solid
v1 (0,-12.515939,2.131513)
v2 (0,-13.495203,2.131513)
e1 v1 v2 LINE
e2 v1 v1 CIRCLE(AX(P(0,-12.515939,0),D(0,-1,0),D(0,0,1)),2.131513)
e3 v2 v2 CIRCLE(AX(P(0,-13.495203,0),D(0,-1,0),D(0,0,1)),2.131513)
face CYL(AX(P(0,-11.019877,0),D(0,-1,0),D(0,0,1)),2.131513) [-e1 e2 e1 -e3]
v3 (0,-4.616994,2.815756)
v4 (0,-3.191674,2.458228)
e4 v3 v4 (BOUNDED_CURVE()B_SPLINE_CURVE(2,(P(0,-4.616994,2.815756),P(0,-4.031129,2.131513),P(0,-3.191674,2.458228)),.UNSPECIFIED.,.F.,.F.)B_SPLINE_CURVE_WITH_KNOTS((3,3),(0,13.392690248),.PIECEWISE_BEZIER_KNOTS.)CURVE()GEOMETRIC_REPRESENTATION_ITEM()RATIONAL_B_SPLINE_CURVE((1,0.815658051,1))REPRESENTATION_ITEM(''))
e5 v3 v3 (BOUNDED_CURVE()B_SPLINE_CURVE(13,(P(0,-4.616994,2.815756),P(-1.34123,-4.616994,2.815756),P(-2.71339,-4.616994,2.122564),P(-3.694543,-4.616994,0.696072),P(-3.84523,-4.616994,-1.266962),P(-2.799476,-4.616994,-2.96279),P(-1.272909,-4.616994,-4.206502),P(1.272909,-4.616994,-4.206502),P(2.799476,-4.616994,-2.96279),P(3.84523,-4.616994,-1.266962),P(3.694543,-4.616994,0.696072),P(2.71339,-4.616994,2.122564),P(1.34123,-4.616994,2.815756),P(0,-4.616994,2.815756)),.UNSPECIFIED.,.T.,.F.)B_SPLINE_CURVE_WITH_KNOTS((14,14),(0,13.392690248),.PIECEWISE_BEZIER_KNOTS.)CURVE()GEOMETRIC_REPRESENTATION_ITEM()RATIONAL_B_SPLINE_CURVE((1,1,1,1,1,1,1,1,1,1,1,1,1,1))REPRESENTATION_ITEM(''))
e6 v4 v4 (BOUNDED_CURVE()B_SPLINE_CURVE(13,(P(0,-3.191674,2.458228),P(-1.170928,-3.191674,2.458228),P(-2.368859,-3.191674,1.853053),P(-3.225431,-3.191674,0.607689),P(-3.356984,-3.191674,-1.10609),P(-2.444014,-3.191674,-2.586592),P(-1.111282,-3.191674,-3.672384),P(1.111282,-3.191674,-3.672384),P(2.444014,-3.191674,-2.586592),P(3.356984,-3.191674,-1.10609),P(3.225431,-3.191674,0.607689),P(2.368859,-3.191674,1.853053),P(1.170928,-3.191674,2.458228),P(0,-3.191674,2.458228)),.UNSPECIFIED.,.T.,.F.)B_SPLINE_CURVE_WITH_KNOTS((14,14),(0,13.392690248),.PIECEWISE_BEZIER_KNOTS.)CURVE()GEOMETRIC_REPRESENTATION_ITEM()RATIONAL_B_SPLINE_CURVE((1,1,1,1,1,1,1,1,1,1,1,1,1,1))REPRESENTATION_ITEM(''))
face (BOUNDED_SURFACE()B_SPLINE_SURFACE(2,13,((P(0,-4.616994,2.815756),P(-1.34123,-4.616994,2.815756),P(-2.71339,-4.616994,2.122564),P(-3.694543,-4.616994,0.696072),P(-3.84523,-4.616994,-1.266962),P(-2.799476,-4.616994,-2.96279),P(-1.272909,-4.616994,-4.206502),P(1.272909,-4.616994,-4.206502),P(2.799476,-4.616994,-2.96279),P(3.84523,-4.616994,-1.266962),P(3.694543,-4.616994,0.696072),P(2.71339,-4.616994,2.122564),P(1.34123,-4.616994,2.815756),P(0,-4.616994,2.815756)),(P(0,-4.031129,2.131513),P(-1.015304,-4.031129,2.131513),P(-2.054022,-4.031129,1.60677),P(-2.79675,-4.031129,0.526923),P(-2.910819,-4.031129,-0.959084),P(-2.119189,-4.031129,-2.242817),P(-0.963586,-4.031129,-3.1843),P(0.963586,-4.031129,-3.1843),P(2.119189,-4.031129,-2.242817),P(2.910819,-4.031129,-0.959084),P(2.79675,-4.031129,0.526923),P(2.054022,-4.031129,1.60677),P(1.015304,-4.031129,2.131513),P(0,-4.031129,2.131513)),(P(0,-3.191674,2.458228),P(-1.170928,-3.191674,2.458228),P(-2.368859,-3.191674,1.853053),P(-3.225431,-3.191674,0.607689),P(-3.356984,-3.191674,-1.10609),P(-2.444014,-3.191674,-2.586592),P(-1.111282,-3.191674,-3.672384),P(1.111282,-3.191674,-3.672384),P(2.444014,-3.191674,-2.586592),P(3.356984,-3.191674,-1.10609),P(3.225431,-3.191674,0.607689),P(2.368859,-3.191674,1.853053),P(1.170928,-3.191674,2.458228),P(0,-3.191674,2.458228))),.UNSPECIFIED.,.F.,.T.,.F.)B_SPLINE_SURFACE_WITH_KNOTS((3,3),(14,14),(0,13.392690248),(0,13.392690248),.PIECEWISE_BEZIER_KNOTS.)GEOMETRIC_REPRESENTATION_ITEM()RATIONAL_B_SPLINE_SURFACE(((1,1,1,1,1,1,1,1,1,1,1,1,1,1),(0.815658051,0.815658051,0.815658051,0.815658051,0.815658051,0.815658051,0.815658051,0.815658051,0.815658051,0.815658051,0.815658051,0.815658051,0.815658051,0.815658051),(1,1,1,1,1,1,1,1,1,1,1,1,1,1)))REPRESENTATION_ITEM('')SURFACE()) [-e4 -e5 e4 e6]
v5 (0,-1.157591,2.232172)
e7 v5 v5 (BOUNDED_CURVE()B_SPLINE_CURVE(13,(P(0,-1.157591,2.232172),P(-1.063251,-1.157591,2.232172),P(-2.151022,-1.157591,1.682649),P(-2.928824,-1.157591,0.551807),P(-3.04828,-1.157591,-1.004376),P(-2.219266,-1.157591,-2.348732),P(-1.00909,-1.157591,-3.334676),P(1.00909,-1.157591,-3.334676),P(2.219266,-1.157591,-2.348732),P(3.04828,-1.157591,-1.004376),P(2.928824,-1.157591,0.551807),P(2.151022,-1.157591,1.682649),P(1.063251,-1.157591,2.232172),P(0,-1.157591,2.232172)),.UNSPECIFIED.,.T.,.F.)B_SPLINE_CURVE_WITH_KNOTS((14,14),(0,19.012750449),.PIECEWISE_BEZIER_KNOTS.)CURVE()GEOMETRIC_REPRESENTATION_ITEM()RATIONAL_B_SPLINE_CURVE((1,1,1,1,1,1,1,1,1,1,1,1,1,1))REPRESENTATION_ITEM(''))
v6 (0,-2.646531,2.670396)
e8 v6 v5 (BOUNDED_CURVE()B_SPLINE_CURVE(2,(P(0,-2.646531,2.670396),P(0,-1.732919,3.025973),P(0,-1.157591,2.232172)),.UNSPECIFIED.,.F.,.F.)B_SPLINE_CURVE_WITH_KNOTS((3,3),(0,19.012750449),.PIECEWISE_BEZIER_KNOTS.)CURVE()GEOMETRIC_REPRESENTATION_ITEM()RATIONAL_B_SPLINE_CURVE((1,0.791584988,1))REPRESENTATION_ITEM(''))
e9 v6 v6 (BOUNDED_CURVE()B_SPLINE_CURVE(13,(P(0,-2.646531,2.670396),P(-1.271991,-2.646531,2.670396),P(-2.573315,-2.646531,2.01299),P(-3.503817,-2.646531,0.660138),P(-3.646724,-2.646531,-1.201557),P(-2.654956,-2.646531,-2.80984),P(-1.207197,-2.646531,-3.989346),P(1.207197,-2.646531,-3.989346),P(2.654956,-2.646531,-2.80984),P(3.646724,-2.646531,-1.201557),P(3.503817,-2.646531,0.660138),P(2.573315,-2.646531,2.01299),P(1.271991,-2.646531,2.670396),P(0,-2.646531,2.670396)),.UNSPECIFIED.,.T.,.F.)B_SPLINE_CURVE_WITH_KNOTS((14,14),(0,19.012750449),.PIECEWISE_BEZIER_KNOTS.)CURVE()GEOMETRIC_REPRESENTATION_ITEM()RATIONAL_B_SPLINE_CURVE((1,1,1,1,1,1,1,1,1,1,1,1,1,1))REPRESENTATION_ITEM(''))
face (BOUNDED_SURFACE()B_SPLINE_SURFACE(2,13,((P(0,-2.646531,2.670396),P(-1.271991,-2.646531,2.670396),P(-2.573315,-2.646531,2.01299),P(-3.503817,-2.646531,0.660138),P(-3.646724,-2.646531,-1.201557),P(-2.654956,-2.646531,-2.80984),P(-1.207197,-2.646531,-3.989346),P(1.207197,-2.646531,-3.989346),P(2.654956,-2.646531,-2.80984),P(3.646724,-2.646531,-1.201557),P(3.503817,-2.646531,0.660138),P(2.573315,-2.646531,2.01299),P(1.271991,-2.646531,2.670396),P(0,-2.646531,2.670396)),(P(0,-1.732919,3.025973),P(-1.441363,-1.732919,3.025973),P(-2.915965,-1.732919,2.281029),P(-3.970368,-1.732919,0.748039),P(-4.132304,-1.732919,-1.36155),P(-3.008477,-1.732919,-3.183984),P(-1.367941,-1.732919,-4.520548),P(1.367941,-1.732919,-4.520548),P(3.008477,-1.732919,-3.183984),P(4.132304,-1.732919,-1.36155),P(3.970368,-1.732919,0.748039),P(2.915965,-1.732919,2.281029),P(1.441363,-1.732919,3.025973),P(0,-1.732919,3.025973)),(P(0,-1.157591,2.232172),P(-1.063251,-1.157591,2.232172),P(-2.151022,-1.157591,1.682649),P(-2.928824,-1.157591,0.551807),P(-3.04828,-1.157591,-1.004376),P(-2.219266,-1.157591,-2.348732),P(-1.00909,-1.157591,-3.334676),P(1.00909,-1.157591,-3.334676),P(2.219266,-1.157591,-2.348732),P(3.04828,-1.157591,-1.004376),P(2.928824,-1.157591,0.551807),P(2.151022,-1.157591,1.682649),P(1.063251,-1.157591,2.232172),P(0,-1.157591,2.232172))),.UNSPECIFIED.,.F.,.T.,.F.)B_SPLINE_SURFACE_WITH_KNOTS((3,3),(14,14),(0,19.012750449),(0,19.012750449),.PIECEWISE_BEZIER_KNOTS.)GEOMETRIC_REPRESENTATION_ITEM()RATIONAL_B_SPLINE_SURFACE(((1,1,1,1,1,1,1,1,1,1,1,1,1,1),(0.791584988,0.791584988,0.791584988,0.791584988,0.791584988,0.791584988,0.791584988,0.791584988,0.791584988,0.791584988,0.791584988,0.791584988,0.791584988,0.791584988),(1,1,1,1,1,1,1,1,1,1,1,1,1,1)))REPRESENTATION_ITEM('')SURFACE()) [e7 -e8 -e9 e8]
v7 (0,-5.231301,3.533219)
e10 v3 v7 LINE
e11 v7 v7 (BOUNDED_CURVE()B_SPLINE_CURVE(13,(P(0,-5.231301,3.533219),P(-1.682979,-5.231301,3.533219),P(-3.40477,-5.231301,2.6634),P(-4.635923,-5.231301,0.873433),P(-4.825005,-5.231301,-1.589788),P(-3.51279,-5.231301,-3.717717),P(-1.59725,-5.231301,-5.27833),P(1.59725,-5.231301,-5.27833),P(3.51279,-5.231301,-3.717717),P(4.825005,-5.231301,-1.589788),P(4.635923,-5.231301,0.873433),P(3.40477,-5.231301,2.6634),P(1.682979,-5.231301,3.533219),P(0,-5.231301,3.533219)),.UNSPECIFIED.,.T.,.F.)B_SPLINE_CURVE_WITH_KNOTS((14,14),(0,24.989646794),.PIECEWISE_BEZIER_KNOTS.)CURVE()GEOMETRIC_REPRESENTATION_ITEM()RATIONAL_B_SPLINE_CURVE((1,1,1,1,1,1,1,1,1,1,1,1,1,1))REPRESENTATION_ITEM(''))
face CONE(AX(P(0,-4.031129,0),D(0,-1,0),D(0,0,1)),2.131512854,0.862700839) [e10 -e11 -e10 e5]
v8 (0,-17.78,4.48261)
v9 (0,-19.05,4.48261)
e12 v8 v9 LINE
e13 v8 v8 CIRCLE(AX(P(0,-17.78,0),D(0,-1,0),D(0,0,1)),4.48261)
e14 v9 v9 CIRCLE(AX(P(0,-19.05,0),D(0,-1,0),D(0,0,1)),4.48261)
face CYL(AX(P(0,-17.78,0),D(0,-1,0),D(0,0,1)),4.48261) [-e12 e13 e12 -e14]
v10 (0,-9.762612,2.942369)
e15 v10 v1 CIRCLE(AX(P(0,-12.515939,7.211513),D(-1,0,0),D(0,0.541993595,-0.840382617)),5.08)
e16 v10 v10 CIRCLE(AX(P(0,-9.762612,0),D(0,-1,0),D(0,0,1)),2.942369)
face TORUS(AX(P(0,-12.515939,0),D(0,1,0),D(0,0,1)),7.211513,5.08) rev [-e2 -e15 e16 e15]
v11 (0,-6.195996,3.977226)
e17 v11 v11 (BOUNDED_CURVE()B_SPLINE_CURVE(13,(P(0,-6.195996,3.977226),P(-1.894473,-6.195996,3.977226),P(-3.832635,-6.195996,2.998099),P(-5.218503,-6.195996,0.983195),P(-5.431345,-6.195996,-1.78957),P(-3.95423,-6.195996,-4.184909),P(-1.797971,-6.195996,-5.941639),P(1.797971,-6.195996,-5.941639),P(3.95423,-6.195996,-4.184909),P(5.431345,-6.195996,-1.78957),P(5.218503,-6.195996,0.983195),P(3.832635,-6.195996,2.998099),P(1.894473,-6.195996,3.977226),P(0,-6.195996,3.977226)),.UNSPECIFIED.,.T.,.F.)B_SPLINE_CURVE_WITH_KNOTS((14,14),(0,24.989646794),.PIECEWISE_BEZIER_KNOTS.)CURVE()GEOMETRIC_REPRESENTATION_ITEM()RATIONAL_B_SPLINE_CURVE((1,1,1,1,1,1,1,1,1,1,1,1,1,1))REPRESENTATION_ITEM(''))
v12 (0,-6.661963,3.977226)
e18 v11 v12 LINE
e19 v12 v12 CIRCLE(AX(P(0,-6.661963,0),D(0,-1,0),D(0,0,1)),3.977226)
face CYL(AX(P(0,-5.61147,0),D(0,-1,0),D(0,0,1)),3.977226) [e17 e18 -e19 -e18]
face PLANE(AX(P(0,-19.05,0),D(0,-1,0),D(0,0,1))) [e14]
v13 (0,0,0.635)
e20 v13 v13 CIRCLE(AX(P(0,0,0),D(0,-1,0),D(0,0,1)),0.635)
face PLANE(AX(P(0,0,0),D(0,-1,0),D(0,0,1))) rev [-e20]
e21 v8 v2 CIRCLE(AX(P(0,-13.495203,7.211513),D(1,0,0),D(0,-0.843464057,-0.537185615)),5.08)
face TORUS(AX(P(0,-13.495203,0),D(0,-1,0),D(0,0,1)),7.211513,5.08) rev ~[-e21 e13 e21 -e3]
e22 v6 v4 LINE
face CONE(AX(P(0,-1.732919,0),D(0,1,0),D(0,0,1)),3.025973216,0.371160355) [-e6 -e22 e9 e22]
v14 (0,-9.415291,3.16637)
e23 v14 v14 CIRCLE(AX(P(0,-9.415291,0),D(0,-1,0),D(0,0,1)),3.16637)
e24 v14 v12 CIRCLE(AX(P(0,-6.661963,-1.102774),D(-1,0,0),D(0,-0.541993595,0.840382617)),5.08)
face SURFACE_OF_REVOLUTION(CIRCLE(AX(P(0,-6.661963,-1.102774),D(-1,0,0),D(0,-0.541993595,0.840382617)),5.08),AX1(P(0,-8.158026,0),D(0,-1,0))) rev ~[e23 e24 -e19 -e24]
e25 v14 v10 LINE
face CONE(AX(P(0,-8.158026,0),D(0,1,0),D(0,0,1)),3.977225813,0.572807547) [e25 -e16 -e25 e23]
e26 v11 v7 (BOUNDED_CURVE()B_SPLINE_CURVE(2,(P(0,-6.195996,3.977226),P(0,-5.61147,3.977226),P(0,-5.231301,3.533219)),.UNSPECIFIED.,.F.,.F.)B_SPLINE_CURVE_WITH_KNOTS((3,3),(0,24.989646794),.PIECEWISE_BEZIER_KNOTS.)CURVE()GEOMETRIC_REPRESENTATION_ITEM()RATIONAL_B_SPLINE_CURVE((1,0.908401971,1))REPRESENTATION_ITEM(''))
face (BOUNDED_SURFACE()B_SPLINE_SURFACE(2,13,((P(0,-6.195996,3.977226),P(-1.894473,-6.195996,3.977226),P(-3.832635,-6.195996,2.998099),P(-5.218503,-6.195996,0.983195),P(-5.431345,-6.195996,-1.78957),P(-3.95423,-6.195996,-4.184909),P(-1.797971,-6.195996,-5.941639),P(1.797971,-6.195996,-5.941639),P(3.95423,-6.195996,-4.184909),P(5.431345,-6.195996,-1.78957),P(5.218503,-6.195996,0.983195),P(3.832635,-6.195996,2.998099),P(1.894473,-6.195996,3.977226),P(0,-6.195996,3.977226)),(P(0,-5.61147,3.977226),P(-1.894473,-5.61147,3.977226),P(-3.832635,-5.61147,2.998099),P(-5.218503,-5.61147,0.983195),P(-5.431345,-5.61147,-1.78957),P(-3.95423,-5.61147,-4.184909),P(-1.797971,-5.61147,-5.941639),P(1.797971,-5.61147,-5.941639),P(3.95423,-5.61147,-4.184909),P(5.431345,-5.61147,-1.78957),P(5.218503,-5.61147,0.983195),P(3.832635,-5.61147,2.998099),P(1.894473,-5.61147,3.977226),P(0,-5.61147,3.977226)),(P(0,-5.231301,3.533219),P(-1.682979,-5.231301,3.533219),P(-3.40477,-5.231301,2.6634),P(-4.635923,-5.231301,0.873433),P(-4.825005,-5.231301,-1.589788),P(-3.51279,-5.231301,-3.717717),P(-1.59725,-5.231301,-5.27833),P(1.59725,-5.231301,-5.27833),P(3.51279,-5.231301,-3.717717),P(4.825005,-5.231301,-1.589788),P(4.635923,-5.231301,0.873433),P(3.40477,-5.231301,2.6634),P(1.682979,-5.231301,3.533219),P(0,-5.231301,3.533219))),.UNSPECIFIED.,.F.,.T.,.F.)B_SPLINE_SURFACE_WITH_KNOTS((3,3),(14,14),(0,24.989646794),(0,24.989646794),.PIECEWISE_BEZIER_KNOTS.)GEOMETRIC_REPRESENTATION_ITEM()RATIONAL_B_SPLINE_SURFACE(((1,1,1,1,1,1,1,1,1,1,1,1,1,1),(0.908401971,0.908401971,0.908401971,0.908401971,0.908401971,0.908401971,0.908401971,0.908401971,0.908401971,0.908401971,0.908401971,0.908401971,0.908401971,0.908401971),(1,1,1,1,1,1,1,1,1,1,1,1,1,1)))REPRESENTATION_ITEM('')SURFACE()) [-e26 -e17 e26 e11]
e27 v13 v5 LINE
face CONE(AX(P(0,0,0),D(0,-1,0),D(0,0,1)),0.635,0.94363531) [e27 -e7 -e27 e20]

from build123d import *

# Parameters (mm, degrees)
F3_R = 1.27


# Not quite as in the source:
# - a fillet or chamfer that OpenCascade refuses, or shapes differently, is made with other operations: its cross-section is extruded or revolved along the edge and cut away or added


with BuildPart() as f1:
    # F0 (on Right) → F1 (revolve)
    with BuildSketch(Plane.YZ):
        Polygon((-19.05, 0), (0, 0), (0, 0.635), (-1.7329187831, 3.0259732157), (-4.0311289486, 2.1315128542), (-5.611469965, 3.9772258134), (-8.1580255717, 3.9772258134), (-11.0198768943, 2.1315128542), (-17.4555711955, 2.1315128542), (-17.78, 4.4826099296), (-19.05, 4.4826099296), align=None)
    revolve(axis=Axis((0, -9.525, 0), (0, -1, 0)))

    # F2: fillet of radius 5.08 on 3 edges, made by hand

    # F2_s1 → F2_t2 (revolve)
    with BuildSketch(Plane.YZ):
        with BuildLine():
            ThreePointArc((-9.7626119553, 2.94236916), (-11.0808174663, 2.3384414426), (-12.5159394181, 2.1315128542))
            Line((-12.5159394181, 2.1315128542), (-11.0198768943, 2.1315128542))
            Line((-11.0198768943, 2.1315128542), (-9.7626119553, 2.94236916))
        make_face()
    revolve(axis=Axis((0, -11.0198768943, 0), (0, -1, 0)))

    # F2_s3 → F2_t4 (revolve, cut)
    with BuildSketch(Plane.YZ):
        with BuildLine():
            ThreePointArc((-9.4152905107, 3.1663695077), (-8.0970849997, 3.7702972251), (-6.6619630479, 3.9772258134))
            Line((-6.6619630479, 3.9772258134), (-8.1580255717, 3.9772258134))
            Line((-8.1580255717, 3.9772258134), (-9.4152905107, 3.1663695077))
        make_face()
    revolve(axis=Axis((0, -8.1580255717, 0), (0, -1, 0)), mode=Mode.SUBTRACT)

    # F2_s5 → F2_t6 (revolve)
    with BuildSketch(Plane.YZ):
        with BuildLine():
            ThreePointArc((-17.78, 4.4826099296), (-15.9389265067, 2.7579060655), (-13.495202592, 2.1315128542))
            Line((-13.495202592, 2.1315128542), (-17.4555711955, 2.1315128542))
            Line((-17.4555711955, 2.1315128542), (-17.78, 4.4826099296))
        make_face()
    revolve(axis=Axis((0, -17.4555711955, 0), (0, -1, 0)))

    # F3
    f3_edges = [f1.edges().sort_by_distance(p)[0] for p in [
        (0, -5.61147, -3.977226),
        (0, -4.031129, -2.131513),
        (0, -1.732919, -3.025973),
    ]]
    fillet(f3_edges, radius=F3_R)


solid = f1.part
